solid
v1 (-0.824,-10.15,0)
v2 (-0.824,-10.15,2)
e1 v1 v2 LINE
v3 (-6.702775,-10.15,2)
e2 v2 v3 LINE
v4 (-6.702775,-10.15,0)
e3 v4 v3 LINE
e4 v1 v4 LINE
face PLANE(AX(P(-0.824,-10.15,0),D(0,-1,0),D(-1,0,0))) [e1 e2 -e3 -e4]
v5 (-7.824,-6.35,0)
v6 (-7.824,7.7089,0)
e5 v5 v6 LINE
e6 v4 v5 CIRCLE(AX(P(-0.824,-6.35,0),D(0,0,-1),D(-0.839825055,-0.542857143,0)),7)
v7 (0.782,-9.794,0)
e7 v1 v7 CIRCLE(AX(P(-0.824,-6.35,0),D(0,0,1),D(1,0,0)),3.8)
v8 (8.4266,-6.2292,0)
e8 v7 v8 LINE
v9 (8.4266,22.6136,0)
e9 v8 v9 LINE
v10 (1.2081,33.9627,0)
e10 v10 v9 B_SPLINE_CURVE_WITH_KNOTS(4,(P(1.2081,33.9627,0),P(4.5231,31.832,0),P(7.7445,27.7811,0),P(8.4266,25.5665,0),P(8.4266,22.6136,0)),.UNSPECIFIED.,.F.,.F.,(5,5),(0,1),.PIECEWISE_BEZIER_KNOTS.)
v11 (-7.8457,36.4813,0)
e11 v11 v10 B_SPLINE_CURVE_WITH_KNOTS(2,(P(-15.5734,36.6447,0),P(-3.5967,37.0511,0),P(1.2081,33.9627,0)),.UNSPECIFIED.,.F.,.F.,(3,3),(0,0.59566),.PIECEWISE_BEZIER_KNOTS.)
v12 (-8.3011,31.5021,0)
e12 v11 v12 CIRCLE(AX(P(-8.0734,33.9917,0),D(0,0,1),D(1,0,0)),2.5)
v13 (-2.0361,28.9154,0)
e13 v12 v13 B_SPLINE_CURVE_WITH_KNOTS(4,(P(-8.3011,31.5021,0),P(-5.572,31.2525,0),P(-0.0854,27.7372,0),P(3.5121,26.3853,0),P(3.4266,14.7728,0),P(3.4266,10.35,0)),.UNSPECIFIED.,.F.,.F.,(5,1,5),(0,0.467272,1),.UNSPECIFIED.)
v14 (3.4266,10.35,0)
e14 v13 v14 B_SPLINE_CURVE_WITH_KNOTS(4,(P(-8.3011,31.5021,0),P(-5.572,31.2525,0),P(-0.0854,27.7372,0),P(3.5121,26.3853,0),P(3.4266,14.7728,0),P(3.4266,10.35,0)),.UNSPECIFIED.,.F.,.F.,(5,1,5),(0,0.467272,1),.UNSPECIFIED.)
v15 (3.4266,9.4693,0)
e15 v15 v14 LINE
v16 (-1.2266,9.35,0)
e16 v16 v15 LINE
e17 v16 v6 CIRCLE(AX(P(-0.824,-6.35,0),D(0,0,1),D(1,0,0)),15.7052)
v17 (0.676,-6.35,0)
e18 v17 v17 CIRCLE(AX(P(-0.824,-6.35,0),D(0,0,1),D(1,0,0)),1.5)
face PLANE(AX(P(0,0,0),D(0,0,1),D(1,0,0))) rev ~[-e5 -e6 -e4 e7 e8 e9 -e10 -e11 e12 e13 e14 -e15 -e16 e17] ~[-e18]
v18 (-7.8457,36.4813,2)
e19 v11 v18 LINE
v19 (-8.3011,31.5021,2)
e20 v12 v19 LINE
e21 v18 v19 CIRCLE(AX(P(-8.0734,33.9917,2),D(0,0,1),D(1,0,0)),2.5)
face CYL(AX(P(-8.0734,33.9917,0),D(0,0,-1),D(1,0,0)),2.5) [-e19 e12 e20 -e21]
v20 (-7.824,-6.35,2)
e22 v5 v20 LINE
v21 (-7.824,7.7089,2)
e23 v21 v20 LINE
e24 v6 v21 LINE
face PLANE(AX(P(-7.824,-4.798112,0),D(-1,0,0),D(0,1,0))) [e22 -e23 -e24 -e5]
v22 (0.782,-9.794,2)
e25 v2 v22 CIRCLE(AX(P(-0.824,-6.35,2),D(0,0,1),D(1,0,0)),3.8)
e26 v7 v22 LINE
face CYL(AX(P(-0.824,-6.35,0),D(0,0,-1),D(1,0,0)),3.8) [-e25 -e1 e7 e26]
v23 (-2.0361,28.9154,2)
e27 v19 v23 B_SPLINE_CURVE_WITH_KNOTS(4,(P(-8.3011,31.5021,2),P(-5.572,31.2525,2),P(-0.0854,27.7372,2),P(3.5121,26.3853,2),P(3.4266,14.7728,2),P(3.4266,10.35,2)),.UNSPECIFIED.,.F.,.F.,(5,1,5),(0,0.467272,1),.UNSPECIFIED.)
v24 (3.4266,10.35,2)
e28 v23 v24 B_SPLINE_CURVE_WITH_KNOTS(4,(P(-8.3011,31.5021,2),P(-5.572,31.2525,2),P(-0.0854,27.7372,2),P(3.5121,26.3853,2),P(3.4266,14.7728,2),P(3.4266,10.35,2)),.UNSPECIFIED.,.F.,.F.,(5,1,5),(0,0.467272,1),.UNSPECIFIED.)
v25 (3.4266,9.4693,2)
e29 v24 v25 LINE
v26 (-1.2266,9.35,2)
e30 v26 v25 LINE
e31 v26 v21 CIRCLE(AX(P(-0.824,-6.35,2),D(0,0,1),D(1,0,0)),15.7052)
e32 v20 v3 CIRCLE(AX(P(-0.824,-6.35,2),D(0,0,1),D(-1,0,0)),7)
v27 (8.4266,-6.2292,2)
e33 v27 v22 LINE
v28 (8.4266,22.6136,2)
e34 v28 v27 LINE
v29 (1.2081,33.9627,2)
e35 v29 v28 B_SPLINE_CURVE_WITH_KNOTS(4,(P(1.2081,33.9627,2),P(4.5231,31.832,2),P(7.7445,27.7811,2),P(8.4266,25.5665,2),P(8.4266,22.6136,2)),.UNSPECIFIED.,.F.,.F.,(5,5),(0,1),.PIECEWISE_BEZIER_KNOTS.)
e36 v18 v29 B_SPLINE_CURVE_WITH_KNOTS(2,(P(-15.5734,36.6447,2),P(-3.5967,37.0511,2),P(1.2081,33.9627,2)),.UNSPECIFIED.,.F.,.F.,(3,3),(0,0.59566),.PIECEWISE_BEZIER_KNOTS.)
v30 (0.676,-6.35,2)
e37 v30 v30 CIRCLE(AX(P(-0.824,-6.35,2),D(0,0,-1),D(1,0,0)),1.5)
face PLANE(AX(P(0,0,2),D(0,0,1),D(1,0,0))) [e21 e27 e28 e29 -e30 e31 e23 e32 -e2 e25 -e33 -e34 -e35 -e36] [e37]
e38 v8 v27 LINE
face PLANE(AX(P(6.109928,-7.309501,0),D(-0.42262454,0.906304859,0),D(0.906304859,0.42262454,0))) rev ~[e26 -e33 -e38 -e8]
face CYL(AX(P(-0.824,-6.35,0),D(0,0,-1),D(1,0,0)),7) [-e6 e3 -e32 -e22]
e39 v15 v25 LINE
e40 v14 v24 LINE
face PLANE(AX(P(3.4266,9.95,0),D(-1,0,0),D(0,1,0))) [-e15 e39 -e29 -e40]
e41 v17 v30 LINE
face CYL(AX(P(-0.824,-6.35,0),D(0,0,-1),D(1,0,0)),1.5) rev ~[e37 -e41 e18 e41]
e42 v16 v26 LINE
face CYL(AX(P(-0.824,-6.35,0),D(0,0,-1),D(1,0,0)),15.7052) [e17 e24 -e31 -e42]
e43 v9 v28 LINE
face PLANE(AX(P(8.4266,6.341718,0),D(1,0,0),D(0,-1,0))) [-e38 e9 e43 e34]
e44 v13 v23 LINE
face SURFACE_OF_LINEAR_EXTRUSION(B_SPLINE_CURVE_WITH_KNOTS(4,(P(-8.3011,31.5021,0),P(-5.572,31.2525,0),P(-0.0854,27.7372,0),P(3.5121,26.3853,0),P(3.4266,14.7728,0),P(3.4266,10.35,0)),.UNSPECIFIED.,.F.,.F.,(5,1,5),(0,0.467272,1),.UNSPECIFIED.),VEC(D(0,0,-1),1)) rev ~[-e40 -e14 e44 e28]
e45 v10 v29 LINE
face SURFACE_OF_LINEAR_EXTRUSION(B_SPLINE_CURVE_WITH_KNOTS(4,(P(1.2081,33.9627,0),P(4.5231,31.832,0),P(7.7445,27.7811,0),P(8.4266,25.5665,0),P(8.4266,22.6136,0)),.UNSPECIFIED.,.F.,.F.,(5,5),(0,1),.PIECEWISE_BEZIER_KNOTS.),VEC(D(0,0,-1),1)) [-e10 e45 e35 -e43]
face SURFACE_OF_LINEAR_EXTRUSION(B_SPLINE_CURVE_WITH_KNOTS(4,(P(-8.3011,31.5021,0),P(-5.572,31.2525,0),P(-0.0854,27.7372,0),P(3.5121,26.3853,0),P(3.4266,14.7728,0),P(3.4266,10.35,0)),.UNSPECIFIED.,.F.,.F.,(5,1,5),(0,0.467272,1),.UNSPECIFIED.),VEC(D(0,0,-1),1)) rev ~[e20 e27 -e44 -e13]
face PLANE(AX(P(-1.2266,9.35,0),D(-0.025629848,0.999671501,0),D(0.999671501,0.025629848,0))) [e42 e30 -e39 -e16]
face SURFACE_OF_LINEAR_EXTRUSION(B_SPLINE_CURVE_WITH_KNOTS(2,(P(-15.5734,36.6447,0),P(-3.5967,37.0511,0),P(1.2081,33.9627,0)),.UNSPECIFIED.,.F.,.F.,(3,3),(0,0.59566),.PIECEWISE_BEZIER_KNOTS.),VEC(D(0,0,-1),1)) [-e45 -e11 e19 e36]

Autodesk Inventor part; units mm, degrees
ref_plane "YZ Plane" through (0, 0, 0) normal (1, 0, 0) x (0, 1, 0)
ref_plane "XZ Plane" through (0, 0, 0) normal (0, 1, 0) x (-1, 0, 0)
ref_plane "XY Plane" through (0, 0, 0) normal (0, 0, 1) x (1, 0, 0)
sketch "Эскиз1" plane through (0, 0, 0) normal (0, 0, 1) x (1, 0, 0)
  line L0 (8.4266, -12.65) -> (-2.5734, -12.65)
  line L1 (-2.5734, -12.65) -> (-2.5734, -47.65)
  line L2 (-2.5734, -47.65) -> (8.4266, -47.65)
  line L3 (8.4266, -47.65) -> (8.4266, -82.9136)
  spline S0 degree 4 poles (2.3773, -93.423) (5.3243, -91.0921) (7.8605, -87.681) (8.4266, -85.6037) (8.4266, -82.9136) knots 0.089011 0.089011 0.089011 0.089011 0.089011 1 1 1 1 1
  spline S1 degree 4 poles (1.3465, -94.1725) (1.6324, -93.9967) (1.8997, -93.813) (2.1479, -93.6217) (2.3773, -93.423) knots 0 0 0 0 0 1 1 1 1 1
  spline S2 degree 4 poles (1.2081, -94.2627) (1.2427, -94.2405) (1.2773, -94.218) (1.3119, -94.1954) (1.3465, -94.1725) knots 0 0 0 0 0 1 1 1 1 1
  spline S3 degree 2 poles (-15.5734, -96.9447) (-3.5967, -97.3511) (1.2081, -94.2627) knots 0 0 0 0.59566 0.59566 0.59566
  line L4 (-125.5734, -96.9447) -> (-15.5734, -96.9447)
  spline S4 degree 2 poles (-125.5734, -96.9447) (-137.55, -97.3511) (-142.3548, -94.2627) knots 0 0 0 0.59566 0.59566 0.59566
  spline S5 degree 4 poles (-142.3548, -94.2627) (-145.6699, -92.132) (-148.8913, -88.0811) (-149.5734, -85.8665) (-149.5734, -82.9136) knots 0 0 0 0 0 1 1 1 1 1
  line L5 (-149.5734, -82.9136) -> (-149.5734, -35.15)
  spline S6 degree 2 poles (-125.5734, 36.6447) (-137.55, 37.0511) (-142.3548, 33.9627) knots 0 0 0 0.59566 0.59566 0.59566
  line L6 (-15.5734, 36.6447) -> (-125.5734, 36.6447)
  spline S7 degree 2 poles (-15.5734, 36.6447) (-3.5967, 37.0511) (1.2081, 33.9627) knots 0 0 0 0.59566 0.59566 0.59566
  spline S8 degree 4 poles (1.2081, 33.9627) (4.5231, 31.832) (7.7445, 27.7811) (8.4266, 25.5665) (8.4266, 22.6136) knots 0 0 0 0 0 1 1 1 1 1
  line L7 (8.4266, 22.6136) -> (8.4266, -12.65)
  line L8 (-10.5734, -92.9447) -> (-10.5734, 32.6447)
  line L9 (-10.5734, 32.6447) -> (-130.5734, 32.6447)
  line L10 (-130.5734, 32.6447) -> (-130.5734, -92.9447)
  line L11 (-130.5734, -92.9447) -> (-10.5734, -92.9447)
  line L12 (5.7794, 10.35) -> (5.7794, -10.35)
  line L13 (-8.4266, 10.35) -> (5.7794, 10.35)
  line L14 (-8.4266, -10.35) -> (-8.4266, 10.35)
  line L15 (5.7794, -10.35) -> (-8.4266, -10.35)
  circle A0 centre (-0.824, -6.35) radius 2.1
  line L16 (-10.5734, 32.6447) -> (-10.5734, -92.9447)
  line L17 (-10.5734, -92.9447) -> (-130.5734, -92.9447)
  line L18 (-130.5734, -92.9447) -> (-130.5734, 32.6447)
  line L19 (-130.5734, 32.6447) -> (-10.5734, 32.6447)
  line L20 (8.4266, -47.65) -> (-2.5734, -47.65)
  line L21 (-2.5734, -47.65) -> (-2.5734, -12.65)
  line L22 (-2.5734, -12.65) -> (8.4266, -12.65)
  line L23 (8.4266, 22.6136) -> (8.4266, -12.65)
  spline S9 degree 4 poles (1.2081, 33.9627) (4.5231, 31.832) (7.7445, 27.7811) (8.4266, 25.5665) (8.4266, 22.6136) knots 0 0 0 0 0 1 1 1 1 1
  spline S10 degree 2 poles (-15.5734, 36.6447) (-3.5967, 37.0511) (1.2081, 33.9627) knots 0 0 0 0.59566 0.59566 0.59566
  line L24 (-125.5734, 36.6447) -> (-15.5734, 36.6447)
  spline S11 degree 2 poles (-142.3548, 33.9627) (-137.55, 37.0511) (-125.5734, 36.6447) knots -0.59566 -0.59566 -0.59566 0 0 0
  spline S12 degree 4 poles (-142.3548, 33.9627) (-145.6699, 31.832) (-148.8913, 27.7811) (-149.5734, 25.5665) (-149.5734, 22.6136) knots 0 0 0 0 0 1 1 1 1 1
  line L25 (-149.5734, 22.6136) -> (-149.5734, -25.15)
  spline S13 degree 2 poles (-125.5734, -96.9447) (-137.55, -97.3511) (-142.3548, -94.2627) knots 0 0 0 0.59566 0.59566 0.59566
  line L26 (-15.5734, -96.9447) -> (-125.5734, -96.9447)
  spline S14 degree 2 poles (-15.5734, -96.9447) (-3.5967, -97.3511) (1.2081, -94.2627) knots 0 0 0 0.59566 0.59566 0.59566
  spline S15 degree 4 poles (1.2081, -94.2627) (1.2427, -94.2405) (1.2773, -94.218) (1.3119, -94.1954) (1.3465, -94.1725) knots 0 0 0 0 0 1 1 1 1 1
  spline S16 degree 4 poles (2.3773, -93.423) (2.1479, -93.6217) (1.8997, -93.813) (1.6324, -93.9967) (1.3465, -94.1725) knots 0 0 0 0 0 1 1 1 1 1
  spline S17 degree 4 poles (2.3773, -93.423) (5.3243, -91.0921) (7.8605, -87.681) (8.4266, -85.6037) (8.4266, -82.9136) knots 0.089011 0.089011 0.089011 0.089011 0.089011 1 1 1 1 1
  line L27 (8.4266, -47.65) -> (8.4266, -82.9136)
  circle A1 centre (-0.824, -6.35) radius 3.8
  line L28 (-0.824, -6.35) -> (0.782, -9.794)
  line L29 (0.782, -9.794) -> (8.4266, -6.2292)
  line L30 (-0.824, -6.35) -> (-0.824, -10.35)
  circle A2 centre (-8.0734, 33.9917) radius 2.5
  line L31 (-8.0734, 33.9917) -> (-7.8457, 36.4813)
  spline S18 degree 4 poles (-8.3011, 31.5021) (-5.572, 31.2525) (-0.0854, 27.7372) (3.5121, 26.3853) (3.4266, 14.7728) (3.4266, 10.35) knots 0 0 0 0 0 0.467272 1 1 1 1 1
  line L32 (8.4266, 10.35) -> (3.4266, 10.35)
  line L33 (-7.8457, 36.4813) -> (-8.3011, 31.5021)
  line L34 (-2.0361, 28.9154) -> (1.2081, 33.9627)
  line L35 (-0.824, -10.15) -> (-7.824, -10.15)
  line L36 (-7.824, -10.15) -> (-7.824, 7.7089)
  line L37 (-7.824, 7.7089) -> (3.4266, 7.7089)
  line L38 (3.4266, 7.7089) -> (3.4266, 10.35)
  line L39 (-8.7741, -6.8356) -> (-1.2266, 9.35)
  line L40 (-8.7741, -6.8356) -> (-2.4299, -9.794)
  line L41 (-1.2266, 9.35) -> (4.6043, 6.631)
  circle A3 centre (-0.824, -6.35) radius 7
  circle A4 centre (-0.824, -6.35) radius 15.7052
  line L42 (-1.2266, 9.35) -> (3.4266, 9.4693)
  circle A5 centre (-0.824, -6.35) radius 1.5
  line L43 (-138.5734, -25.15) -> (-149.5734, -25.15)
  line L44 (-149.5734, -25.15) -> (-149.5734, 22.6136)
  line L45 (-149.5734, -35.15) -> (-138.5734, -35.15)
  line L46 (-138.5734, -35.15) -> (-138.5734, -25.15)
  line L47 (-149.5734, -25.15) -> (-138.5734, -25.15)
  line L48 (-138.5734, -25.15) -> (-138.5734, -35.15)
  line L49 (-138.5734, -35.15) -> (-149.5734, -35.15)
  line L50 (-149.5734, -35.15) -> (-149.5734, -82.9136)
  line L51 (-9.8234, -70.25) -> (-9.8234, -63.25)
  line L52 (-9.8234, -63.25) -> (4.1266, -63.25)
  line L53 (4.1266, -63.25) -> (4.1266, -70.25)
  line L54 (4.1266, -70.25) -> (-9.8234, -70.25)
  line L55 (-9.9734, 2.95) -> (-9.9734, 9.95)
  line L56 (-9.9734, 9.95) -> (4.1266, 9.95)
  line L57 (4.1266, 9.95) -> (4.1266, 2.95)
  line L58 (4.1266, 2.95) -> (-9.9734, 2.95)
  line L59 (-9.8234, -63.25) -> (-9.8234, -70.25)
  line L60 (-9.8234, -70.25) -> (4.1266, -70.25)
  line L61 (4.1266, -70.25) -> (4.1266, -63.25)
  line L62 (4.1266, -63.25) -> (-9.8234, -63.25)
  line L63 (-9.9734, 9.95) -> (-9.9734, 2.95)
  line L64 (-9.9734, 2.95) -> (4.1266, 2.95)
  line L65 (4.1266, 2.95) -> (4.1266, 9.95)
  line L66 (4.1266, 9.95) -> (-9.9734, 9.95)
  spline S19 degree 4 poles (-142.3548, -94.2627) (-145.6699, -92.132) (-148.8913, -88.0811) (-149.5734, -85.8665) (-149.5734, -82.9136) knots 0 0 0 0 0 1 1 1 1 1
  spline S20 degree 4 poles (-142.3548, 33.9627) (-145.6699, 31.832) (-148.8913, 27.7811) (-149.5734, 25.5665) (-149.5734, 22.6136) knots 0 0 0 0 0 1 1 1 1 1
  point P0 (0, 0)
  point P1 (1.9242, 24.3867)
  point P2 (3.4266, 9.35)
  point P3 (-6.5685, -10.35)
  point P4 (5.7794, -8.6727)
  point P5 (6.11, -7.3095)
  point P6 (-7.886, 36.4854)
  point P7 (-7.824, -6.35)
  point P8 (-6.7027, -10.15)
  point P9 (-7.8466, 36.4837)
  point P10 (1.2103, 33.9674)
  point P11 (-7.8461, 36.4827)
  point P12 (1.2099, 33.9666)
  point P13 (-7.8465, 36.4834)
  point P14 (-7.8062, 36.4797)
  point P15 (1.2097, 33.9661)
  point P16 (-7.8463, 36.4828)
  point P17 (-7.8061, 36.4794)
  point P18 (1.2094, 33.9656)
  point P19 (-7.8462, 36.4824)
  point P20 (-7.846, 36.4824)
  point P21 (-7.8462, 36.4824)
  point P22 (1.2092, 33.9651)
  point P23 (-7.8457, 36.4813)
  point P24 (1.2089, 33.9645)
  point P25 (-7.8461, 36.4821)
  point P26 (-7.8058, 36.4784)
  point P27 (1.2087, 33.964)
  point P28 (-7.8458, 36.4813)
  point P29 (-7.8057, 36.4781)
  point P30 (1.2085, 33.9635)
  point P31 (-7.8458, 36.4813)
  point P32 (-7.8457, 36.4813)
  dimension "d0" = 7.6
  dimension "d1" = 25
  dimension "d2" = 5
  dimension "d3" = 5
  dimension "d4" = 6
  dimension "d6" = 7
  dimension "d7" = 25
  dimension "d8" = 7
  dimension "d9" = 1
  dimension "d13" = 3
extrude "Выдавливание1" add sketch "Эскиз1" along normal blind 2 contours L29 A3 L12 A4 L7 | A4 L12 L32 L7 | L29 L12 A3 | L32 L13 S18 L34 S8 L7 | A4 L57 L56 L38 L13 L12 | L12 A3 L39 L58 L57 A4 | L29 A1 L40 A3 L12 | A3 L40 A1 L35 | L30 A0 L28 A1 | A1 L28 A0 L30 | L57 L41 L37 L38 A4 | A4 L38 L56 L57 | L30 A5 L28 A0 | A0 L28 A5 L30 | L34 S18 A2 S7 | A3 L36 L39 | L39 L36 L58 | A4 L42 L38 | L38 L37 L41 A4 | L57 L58 L39 L37 L41 | L31 L33 A2 | A2 L33 L31 | L58 L36 L37 L39 | L41 L37 L39 | L39 L37 A4 picked at (5.8525, -5.4253)
sketch "Эскиз2" plane through (0, 0, 2) normal (0, 0, 1) x (1, 0, 0)
  line L0 (8.4266, -6.2292) -> (8.4266, 22.6136) projected
  line L1 (0.782, -9.794) -> (8.4266, -6.2292) projected
  arc A0 (-0.824, -10.15) -> (0.782, -9.794) centre (-0.824, -6.35) ccw projected
  line L2 (-6.7027, -10.15) -> (-0.824, -10.15) projected
  arc A1 (-7.824, -6.35) -> (-6.7027, -10.15) centre (-0.824, -6.35) ccw projected
  line L3 (-7.824, 7.7089) -> (-7.824, -6.35) projected
  arc A2 (-1.2266, 9.35) -> (-7.824, 7.7089) centre (-0.824, -6.35) ccw projected
  line L4 (3.4266, 9.4693) -> (-1.2266, 9.35) projected
  line L5 (3.4266, 10.35) -> (3.4266, 9.4693) projected
  arc A3 (-7.8457, 36.4813) -> (-8.3011, 31.5021) centre (-8.0734, 33.9917) ccw projected
  circle A4 centre (-0.824, -6.35) radius 1.5 projected
  circle A5 centre (-0.824, -6.35) radius 43.4879
  arc A6 (-7.8458, 36.4818) -> (-8.3011, 31.5021) centre (-8.0734, 33.9917) ccw projected
  point P0 (0, 0)
  point P1 (-7.8466, 36.4842)
  point P2 (-7.8463, 36.4831)
properties part number "limit_arm"
